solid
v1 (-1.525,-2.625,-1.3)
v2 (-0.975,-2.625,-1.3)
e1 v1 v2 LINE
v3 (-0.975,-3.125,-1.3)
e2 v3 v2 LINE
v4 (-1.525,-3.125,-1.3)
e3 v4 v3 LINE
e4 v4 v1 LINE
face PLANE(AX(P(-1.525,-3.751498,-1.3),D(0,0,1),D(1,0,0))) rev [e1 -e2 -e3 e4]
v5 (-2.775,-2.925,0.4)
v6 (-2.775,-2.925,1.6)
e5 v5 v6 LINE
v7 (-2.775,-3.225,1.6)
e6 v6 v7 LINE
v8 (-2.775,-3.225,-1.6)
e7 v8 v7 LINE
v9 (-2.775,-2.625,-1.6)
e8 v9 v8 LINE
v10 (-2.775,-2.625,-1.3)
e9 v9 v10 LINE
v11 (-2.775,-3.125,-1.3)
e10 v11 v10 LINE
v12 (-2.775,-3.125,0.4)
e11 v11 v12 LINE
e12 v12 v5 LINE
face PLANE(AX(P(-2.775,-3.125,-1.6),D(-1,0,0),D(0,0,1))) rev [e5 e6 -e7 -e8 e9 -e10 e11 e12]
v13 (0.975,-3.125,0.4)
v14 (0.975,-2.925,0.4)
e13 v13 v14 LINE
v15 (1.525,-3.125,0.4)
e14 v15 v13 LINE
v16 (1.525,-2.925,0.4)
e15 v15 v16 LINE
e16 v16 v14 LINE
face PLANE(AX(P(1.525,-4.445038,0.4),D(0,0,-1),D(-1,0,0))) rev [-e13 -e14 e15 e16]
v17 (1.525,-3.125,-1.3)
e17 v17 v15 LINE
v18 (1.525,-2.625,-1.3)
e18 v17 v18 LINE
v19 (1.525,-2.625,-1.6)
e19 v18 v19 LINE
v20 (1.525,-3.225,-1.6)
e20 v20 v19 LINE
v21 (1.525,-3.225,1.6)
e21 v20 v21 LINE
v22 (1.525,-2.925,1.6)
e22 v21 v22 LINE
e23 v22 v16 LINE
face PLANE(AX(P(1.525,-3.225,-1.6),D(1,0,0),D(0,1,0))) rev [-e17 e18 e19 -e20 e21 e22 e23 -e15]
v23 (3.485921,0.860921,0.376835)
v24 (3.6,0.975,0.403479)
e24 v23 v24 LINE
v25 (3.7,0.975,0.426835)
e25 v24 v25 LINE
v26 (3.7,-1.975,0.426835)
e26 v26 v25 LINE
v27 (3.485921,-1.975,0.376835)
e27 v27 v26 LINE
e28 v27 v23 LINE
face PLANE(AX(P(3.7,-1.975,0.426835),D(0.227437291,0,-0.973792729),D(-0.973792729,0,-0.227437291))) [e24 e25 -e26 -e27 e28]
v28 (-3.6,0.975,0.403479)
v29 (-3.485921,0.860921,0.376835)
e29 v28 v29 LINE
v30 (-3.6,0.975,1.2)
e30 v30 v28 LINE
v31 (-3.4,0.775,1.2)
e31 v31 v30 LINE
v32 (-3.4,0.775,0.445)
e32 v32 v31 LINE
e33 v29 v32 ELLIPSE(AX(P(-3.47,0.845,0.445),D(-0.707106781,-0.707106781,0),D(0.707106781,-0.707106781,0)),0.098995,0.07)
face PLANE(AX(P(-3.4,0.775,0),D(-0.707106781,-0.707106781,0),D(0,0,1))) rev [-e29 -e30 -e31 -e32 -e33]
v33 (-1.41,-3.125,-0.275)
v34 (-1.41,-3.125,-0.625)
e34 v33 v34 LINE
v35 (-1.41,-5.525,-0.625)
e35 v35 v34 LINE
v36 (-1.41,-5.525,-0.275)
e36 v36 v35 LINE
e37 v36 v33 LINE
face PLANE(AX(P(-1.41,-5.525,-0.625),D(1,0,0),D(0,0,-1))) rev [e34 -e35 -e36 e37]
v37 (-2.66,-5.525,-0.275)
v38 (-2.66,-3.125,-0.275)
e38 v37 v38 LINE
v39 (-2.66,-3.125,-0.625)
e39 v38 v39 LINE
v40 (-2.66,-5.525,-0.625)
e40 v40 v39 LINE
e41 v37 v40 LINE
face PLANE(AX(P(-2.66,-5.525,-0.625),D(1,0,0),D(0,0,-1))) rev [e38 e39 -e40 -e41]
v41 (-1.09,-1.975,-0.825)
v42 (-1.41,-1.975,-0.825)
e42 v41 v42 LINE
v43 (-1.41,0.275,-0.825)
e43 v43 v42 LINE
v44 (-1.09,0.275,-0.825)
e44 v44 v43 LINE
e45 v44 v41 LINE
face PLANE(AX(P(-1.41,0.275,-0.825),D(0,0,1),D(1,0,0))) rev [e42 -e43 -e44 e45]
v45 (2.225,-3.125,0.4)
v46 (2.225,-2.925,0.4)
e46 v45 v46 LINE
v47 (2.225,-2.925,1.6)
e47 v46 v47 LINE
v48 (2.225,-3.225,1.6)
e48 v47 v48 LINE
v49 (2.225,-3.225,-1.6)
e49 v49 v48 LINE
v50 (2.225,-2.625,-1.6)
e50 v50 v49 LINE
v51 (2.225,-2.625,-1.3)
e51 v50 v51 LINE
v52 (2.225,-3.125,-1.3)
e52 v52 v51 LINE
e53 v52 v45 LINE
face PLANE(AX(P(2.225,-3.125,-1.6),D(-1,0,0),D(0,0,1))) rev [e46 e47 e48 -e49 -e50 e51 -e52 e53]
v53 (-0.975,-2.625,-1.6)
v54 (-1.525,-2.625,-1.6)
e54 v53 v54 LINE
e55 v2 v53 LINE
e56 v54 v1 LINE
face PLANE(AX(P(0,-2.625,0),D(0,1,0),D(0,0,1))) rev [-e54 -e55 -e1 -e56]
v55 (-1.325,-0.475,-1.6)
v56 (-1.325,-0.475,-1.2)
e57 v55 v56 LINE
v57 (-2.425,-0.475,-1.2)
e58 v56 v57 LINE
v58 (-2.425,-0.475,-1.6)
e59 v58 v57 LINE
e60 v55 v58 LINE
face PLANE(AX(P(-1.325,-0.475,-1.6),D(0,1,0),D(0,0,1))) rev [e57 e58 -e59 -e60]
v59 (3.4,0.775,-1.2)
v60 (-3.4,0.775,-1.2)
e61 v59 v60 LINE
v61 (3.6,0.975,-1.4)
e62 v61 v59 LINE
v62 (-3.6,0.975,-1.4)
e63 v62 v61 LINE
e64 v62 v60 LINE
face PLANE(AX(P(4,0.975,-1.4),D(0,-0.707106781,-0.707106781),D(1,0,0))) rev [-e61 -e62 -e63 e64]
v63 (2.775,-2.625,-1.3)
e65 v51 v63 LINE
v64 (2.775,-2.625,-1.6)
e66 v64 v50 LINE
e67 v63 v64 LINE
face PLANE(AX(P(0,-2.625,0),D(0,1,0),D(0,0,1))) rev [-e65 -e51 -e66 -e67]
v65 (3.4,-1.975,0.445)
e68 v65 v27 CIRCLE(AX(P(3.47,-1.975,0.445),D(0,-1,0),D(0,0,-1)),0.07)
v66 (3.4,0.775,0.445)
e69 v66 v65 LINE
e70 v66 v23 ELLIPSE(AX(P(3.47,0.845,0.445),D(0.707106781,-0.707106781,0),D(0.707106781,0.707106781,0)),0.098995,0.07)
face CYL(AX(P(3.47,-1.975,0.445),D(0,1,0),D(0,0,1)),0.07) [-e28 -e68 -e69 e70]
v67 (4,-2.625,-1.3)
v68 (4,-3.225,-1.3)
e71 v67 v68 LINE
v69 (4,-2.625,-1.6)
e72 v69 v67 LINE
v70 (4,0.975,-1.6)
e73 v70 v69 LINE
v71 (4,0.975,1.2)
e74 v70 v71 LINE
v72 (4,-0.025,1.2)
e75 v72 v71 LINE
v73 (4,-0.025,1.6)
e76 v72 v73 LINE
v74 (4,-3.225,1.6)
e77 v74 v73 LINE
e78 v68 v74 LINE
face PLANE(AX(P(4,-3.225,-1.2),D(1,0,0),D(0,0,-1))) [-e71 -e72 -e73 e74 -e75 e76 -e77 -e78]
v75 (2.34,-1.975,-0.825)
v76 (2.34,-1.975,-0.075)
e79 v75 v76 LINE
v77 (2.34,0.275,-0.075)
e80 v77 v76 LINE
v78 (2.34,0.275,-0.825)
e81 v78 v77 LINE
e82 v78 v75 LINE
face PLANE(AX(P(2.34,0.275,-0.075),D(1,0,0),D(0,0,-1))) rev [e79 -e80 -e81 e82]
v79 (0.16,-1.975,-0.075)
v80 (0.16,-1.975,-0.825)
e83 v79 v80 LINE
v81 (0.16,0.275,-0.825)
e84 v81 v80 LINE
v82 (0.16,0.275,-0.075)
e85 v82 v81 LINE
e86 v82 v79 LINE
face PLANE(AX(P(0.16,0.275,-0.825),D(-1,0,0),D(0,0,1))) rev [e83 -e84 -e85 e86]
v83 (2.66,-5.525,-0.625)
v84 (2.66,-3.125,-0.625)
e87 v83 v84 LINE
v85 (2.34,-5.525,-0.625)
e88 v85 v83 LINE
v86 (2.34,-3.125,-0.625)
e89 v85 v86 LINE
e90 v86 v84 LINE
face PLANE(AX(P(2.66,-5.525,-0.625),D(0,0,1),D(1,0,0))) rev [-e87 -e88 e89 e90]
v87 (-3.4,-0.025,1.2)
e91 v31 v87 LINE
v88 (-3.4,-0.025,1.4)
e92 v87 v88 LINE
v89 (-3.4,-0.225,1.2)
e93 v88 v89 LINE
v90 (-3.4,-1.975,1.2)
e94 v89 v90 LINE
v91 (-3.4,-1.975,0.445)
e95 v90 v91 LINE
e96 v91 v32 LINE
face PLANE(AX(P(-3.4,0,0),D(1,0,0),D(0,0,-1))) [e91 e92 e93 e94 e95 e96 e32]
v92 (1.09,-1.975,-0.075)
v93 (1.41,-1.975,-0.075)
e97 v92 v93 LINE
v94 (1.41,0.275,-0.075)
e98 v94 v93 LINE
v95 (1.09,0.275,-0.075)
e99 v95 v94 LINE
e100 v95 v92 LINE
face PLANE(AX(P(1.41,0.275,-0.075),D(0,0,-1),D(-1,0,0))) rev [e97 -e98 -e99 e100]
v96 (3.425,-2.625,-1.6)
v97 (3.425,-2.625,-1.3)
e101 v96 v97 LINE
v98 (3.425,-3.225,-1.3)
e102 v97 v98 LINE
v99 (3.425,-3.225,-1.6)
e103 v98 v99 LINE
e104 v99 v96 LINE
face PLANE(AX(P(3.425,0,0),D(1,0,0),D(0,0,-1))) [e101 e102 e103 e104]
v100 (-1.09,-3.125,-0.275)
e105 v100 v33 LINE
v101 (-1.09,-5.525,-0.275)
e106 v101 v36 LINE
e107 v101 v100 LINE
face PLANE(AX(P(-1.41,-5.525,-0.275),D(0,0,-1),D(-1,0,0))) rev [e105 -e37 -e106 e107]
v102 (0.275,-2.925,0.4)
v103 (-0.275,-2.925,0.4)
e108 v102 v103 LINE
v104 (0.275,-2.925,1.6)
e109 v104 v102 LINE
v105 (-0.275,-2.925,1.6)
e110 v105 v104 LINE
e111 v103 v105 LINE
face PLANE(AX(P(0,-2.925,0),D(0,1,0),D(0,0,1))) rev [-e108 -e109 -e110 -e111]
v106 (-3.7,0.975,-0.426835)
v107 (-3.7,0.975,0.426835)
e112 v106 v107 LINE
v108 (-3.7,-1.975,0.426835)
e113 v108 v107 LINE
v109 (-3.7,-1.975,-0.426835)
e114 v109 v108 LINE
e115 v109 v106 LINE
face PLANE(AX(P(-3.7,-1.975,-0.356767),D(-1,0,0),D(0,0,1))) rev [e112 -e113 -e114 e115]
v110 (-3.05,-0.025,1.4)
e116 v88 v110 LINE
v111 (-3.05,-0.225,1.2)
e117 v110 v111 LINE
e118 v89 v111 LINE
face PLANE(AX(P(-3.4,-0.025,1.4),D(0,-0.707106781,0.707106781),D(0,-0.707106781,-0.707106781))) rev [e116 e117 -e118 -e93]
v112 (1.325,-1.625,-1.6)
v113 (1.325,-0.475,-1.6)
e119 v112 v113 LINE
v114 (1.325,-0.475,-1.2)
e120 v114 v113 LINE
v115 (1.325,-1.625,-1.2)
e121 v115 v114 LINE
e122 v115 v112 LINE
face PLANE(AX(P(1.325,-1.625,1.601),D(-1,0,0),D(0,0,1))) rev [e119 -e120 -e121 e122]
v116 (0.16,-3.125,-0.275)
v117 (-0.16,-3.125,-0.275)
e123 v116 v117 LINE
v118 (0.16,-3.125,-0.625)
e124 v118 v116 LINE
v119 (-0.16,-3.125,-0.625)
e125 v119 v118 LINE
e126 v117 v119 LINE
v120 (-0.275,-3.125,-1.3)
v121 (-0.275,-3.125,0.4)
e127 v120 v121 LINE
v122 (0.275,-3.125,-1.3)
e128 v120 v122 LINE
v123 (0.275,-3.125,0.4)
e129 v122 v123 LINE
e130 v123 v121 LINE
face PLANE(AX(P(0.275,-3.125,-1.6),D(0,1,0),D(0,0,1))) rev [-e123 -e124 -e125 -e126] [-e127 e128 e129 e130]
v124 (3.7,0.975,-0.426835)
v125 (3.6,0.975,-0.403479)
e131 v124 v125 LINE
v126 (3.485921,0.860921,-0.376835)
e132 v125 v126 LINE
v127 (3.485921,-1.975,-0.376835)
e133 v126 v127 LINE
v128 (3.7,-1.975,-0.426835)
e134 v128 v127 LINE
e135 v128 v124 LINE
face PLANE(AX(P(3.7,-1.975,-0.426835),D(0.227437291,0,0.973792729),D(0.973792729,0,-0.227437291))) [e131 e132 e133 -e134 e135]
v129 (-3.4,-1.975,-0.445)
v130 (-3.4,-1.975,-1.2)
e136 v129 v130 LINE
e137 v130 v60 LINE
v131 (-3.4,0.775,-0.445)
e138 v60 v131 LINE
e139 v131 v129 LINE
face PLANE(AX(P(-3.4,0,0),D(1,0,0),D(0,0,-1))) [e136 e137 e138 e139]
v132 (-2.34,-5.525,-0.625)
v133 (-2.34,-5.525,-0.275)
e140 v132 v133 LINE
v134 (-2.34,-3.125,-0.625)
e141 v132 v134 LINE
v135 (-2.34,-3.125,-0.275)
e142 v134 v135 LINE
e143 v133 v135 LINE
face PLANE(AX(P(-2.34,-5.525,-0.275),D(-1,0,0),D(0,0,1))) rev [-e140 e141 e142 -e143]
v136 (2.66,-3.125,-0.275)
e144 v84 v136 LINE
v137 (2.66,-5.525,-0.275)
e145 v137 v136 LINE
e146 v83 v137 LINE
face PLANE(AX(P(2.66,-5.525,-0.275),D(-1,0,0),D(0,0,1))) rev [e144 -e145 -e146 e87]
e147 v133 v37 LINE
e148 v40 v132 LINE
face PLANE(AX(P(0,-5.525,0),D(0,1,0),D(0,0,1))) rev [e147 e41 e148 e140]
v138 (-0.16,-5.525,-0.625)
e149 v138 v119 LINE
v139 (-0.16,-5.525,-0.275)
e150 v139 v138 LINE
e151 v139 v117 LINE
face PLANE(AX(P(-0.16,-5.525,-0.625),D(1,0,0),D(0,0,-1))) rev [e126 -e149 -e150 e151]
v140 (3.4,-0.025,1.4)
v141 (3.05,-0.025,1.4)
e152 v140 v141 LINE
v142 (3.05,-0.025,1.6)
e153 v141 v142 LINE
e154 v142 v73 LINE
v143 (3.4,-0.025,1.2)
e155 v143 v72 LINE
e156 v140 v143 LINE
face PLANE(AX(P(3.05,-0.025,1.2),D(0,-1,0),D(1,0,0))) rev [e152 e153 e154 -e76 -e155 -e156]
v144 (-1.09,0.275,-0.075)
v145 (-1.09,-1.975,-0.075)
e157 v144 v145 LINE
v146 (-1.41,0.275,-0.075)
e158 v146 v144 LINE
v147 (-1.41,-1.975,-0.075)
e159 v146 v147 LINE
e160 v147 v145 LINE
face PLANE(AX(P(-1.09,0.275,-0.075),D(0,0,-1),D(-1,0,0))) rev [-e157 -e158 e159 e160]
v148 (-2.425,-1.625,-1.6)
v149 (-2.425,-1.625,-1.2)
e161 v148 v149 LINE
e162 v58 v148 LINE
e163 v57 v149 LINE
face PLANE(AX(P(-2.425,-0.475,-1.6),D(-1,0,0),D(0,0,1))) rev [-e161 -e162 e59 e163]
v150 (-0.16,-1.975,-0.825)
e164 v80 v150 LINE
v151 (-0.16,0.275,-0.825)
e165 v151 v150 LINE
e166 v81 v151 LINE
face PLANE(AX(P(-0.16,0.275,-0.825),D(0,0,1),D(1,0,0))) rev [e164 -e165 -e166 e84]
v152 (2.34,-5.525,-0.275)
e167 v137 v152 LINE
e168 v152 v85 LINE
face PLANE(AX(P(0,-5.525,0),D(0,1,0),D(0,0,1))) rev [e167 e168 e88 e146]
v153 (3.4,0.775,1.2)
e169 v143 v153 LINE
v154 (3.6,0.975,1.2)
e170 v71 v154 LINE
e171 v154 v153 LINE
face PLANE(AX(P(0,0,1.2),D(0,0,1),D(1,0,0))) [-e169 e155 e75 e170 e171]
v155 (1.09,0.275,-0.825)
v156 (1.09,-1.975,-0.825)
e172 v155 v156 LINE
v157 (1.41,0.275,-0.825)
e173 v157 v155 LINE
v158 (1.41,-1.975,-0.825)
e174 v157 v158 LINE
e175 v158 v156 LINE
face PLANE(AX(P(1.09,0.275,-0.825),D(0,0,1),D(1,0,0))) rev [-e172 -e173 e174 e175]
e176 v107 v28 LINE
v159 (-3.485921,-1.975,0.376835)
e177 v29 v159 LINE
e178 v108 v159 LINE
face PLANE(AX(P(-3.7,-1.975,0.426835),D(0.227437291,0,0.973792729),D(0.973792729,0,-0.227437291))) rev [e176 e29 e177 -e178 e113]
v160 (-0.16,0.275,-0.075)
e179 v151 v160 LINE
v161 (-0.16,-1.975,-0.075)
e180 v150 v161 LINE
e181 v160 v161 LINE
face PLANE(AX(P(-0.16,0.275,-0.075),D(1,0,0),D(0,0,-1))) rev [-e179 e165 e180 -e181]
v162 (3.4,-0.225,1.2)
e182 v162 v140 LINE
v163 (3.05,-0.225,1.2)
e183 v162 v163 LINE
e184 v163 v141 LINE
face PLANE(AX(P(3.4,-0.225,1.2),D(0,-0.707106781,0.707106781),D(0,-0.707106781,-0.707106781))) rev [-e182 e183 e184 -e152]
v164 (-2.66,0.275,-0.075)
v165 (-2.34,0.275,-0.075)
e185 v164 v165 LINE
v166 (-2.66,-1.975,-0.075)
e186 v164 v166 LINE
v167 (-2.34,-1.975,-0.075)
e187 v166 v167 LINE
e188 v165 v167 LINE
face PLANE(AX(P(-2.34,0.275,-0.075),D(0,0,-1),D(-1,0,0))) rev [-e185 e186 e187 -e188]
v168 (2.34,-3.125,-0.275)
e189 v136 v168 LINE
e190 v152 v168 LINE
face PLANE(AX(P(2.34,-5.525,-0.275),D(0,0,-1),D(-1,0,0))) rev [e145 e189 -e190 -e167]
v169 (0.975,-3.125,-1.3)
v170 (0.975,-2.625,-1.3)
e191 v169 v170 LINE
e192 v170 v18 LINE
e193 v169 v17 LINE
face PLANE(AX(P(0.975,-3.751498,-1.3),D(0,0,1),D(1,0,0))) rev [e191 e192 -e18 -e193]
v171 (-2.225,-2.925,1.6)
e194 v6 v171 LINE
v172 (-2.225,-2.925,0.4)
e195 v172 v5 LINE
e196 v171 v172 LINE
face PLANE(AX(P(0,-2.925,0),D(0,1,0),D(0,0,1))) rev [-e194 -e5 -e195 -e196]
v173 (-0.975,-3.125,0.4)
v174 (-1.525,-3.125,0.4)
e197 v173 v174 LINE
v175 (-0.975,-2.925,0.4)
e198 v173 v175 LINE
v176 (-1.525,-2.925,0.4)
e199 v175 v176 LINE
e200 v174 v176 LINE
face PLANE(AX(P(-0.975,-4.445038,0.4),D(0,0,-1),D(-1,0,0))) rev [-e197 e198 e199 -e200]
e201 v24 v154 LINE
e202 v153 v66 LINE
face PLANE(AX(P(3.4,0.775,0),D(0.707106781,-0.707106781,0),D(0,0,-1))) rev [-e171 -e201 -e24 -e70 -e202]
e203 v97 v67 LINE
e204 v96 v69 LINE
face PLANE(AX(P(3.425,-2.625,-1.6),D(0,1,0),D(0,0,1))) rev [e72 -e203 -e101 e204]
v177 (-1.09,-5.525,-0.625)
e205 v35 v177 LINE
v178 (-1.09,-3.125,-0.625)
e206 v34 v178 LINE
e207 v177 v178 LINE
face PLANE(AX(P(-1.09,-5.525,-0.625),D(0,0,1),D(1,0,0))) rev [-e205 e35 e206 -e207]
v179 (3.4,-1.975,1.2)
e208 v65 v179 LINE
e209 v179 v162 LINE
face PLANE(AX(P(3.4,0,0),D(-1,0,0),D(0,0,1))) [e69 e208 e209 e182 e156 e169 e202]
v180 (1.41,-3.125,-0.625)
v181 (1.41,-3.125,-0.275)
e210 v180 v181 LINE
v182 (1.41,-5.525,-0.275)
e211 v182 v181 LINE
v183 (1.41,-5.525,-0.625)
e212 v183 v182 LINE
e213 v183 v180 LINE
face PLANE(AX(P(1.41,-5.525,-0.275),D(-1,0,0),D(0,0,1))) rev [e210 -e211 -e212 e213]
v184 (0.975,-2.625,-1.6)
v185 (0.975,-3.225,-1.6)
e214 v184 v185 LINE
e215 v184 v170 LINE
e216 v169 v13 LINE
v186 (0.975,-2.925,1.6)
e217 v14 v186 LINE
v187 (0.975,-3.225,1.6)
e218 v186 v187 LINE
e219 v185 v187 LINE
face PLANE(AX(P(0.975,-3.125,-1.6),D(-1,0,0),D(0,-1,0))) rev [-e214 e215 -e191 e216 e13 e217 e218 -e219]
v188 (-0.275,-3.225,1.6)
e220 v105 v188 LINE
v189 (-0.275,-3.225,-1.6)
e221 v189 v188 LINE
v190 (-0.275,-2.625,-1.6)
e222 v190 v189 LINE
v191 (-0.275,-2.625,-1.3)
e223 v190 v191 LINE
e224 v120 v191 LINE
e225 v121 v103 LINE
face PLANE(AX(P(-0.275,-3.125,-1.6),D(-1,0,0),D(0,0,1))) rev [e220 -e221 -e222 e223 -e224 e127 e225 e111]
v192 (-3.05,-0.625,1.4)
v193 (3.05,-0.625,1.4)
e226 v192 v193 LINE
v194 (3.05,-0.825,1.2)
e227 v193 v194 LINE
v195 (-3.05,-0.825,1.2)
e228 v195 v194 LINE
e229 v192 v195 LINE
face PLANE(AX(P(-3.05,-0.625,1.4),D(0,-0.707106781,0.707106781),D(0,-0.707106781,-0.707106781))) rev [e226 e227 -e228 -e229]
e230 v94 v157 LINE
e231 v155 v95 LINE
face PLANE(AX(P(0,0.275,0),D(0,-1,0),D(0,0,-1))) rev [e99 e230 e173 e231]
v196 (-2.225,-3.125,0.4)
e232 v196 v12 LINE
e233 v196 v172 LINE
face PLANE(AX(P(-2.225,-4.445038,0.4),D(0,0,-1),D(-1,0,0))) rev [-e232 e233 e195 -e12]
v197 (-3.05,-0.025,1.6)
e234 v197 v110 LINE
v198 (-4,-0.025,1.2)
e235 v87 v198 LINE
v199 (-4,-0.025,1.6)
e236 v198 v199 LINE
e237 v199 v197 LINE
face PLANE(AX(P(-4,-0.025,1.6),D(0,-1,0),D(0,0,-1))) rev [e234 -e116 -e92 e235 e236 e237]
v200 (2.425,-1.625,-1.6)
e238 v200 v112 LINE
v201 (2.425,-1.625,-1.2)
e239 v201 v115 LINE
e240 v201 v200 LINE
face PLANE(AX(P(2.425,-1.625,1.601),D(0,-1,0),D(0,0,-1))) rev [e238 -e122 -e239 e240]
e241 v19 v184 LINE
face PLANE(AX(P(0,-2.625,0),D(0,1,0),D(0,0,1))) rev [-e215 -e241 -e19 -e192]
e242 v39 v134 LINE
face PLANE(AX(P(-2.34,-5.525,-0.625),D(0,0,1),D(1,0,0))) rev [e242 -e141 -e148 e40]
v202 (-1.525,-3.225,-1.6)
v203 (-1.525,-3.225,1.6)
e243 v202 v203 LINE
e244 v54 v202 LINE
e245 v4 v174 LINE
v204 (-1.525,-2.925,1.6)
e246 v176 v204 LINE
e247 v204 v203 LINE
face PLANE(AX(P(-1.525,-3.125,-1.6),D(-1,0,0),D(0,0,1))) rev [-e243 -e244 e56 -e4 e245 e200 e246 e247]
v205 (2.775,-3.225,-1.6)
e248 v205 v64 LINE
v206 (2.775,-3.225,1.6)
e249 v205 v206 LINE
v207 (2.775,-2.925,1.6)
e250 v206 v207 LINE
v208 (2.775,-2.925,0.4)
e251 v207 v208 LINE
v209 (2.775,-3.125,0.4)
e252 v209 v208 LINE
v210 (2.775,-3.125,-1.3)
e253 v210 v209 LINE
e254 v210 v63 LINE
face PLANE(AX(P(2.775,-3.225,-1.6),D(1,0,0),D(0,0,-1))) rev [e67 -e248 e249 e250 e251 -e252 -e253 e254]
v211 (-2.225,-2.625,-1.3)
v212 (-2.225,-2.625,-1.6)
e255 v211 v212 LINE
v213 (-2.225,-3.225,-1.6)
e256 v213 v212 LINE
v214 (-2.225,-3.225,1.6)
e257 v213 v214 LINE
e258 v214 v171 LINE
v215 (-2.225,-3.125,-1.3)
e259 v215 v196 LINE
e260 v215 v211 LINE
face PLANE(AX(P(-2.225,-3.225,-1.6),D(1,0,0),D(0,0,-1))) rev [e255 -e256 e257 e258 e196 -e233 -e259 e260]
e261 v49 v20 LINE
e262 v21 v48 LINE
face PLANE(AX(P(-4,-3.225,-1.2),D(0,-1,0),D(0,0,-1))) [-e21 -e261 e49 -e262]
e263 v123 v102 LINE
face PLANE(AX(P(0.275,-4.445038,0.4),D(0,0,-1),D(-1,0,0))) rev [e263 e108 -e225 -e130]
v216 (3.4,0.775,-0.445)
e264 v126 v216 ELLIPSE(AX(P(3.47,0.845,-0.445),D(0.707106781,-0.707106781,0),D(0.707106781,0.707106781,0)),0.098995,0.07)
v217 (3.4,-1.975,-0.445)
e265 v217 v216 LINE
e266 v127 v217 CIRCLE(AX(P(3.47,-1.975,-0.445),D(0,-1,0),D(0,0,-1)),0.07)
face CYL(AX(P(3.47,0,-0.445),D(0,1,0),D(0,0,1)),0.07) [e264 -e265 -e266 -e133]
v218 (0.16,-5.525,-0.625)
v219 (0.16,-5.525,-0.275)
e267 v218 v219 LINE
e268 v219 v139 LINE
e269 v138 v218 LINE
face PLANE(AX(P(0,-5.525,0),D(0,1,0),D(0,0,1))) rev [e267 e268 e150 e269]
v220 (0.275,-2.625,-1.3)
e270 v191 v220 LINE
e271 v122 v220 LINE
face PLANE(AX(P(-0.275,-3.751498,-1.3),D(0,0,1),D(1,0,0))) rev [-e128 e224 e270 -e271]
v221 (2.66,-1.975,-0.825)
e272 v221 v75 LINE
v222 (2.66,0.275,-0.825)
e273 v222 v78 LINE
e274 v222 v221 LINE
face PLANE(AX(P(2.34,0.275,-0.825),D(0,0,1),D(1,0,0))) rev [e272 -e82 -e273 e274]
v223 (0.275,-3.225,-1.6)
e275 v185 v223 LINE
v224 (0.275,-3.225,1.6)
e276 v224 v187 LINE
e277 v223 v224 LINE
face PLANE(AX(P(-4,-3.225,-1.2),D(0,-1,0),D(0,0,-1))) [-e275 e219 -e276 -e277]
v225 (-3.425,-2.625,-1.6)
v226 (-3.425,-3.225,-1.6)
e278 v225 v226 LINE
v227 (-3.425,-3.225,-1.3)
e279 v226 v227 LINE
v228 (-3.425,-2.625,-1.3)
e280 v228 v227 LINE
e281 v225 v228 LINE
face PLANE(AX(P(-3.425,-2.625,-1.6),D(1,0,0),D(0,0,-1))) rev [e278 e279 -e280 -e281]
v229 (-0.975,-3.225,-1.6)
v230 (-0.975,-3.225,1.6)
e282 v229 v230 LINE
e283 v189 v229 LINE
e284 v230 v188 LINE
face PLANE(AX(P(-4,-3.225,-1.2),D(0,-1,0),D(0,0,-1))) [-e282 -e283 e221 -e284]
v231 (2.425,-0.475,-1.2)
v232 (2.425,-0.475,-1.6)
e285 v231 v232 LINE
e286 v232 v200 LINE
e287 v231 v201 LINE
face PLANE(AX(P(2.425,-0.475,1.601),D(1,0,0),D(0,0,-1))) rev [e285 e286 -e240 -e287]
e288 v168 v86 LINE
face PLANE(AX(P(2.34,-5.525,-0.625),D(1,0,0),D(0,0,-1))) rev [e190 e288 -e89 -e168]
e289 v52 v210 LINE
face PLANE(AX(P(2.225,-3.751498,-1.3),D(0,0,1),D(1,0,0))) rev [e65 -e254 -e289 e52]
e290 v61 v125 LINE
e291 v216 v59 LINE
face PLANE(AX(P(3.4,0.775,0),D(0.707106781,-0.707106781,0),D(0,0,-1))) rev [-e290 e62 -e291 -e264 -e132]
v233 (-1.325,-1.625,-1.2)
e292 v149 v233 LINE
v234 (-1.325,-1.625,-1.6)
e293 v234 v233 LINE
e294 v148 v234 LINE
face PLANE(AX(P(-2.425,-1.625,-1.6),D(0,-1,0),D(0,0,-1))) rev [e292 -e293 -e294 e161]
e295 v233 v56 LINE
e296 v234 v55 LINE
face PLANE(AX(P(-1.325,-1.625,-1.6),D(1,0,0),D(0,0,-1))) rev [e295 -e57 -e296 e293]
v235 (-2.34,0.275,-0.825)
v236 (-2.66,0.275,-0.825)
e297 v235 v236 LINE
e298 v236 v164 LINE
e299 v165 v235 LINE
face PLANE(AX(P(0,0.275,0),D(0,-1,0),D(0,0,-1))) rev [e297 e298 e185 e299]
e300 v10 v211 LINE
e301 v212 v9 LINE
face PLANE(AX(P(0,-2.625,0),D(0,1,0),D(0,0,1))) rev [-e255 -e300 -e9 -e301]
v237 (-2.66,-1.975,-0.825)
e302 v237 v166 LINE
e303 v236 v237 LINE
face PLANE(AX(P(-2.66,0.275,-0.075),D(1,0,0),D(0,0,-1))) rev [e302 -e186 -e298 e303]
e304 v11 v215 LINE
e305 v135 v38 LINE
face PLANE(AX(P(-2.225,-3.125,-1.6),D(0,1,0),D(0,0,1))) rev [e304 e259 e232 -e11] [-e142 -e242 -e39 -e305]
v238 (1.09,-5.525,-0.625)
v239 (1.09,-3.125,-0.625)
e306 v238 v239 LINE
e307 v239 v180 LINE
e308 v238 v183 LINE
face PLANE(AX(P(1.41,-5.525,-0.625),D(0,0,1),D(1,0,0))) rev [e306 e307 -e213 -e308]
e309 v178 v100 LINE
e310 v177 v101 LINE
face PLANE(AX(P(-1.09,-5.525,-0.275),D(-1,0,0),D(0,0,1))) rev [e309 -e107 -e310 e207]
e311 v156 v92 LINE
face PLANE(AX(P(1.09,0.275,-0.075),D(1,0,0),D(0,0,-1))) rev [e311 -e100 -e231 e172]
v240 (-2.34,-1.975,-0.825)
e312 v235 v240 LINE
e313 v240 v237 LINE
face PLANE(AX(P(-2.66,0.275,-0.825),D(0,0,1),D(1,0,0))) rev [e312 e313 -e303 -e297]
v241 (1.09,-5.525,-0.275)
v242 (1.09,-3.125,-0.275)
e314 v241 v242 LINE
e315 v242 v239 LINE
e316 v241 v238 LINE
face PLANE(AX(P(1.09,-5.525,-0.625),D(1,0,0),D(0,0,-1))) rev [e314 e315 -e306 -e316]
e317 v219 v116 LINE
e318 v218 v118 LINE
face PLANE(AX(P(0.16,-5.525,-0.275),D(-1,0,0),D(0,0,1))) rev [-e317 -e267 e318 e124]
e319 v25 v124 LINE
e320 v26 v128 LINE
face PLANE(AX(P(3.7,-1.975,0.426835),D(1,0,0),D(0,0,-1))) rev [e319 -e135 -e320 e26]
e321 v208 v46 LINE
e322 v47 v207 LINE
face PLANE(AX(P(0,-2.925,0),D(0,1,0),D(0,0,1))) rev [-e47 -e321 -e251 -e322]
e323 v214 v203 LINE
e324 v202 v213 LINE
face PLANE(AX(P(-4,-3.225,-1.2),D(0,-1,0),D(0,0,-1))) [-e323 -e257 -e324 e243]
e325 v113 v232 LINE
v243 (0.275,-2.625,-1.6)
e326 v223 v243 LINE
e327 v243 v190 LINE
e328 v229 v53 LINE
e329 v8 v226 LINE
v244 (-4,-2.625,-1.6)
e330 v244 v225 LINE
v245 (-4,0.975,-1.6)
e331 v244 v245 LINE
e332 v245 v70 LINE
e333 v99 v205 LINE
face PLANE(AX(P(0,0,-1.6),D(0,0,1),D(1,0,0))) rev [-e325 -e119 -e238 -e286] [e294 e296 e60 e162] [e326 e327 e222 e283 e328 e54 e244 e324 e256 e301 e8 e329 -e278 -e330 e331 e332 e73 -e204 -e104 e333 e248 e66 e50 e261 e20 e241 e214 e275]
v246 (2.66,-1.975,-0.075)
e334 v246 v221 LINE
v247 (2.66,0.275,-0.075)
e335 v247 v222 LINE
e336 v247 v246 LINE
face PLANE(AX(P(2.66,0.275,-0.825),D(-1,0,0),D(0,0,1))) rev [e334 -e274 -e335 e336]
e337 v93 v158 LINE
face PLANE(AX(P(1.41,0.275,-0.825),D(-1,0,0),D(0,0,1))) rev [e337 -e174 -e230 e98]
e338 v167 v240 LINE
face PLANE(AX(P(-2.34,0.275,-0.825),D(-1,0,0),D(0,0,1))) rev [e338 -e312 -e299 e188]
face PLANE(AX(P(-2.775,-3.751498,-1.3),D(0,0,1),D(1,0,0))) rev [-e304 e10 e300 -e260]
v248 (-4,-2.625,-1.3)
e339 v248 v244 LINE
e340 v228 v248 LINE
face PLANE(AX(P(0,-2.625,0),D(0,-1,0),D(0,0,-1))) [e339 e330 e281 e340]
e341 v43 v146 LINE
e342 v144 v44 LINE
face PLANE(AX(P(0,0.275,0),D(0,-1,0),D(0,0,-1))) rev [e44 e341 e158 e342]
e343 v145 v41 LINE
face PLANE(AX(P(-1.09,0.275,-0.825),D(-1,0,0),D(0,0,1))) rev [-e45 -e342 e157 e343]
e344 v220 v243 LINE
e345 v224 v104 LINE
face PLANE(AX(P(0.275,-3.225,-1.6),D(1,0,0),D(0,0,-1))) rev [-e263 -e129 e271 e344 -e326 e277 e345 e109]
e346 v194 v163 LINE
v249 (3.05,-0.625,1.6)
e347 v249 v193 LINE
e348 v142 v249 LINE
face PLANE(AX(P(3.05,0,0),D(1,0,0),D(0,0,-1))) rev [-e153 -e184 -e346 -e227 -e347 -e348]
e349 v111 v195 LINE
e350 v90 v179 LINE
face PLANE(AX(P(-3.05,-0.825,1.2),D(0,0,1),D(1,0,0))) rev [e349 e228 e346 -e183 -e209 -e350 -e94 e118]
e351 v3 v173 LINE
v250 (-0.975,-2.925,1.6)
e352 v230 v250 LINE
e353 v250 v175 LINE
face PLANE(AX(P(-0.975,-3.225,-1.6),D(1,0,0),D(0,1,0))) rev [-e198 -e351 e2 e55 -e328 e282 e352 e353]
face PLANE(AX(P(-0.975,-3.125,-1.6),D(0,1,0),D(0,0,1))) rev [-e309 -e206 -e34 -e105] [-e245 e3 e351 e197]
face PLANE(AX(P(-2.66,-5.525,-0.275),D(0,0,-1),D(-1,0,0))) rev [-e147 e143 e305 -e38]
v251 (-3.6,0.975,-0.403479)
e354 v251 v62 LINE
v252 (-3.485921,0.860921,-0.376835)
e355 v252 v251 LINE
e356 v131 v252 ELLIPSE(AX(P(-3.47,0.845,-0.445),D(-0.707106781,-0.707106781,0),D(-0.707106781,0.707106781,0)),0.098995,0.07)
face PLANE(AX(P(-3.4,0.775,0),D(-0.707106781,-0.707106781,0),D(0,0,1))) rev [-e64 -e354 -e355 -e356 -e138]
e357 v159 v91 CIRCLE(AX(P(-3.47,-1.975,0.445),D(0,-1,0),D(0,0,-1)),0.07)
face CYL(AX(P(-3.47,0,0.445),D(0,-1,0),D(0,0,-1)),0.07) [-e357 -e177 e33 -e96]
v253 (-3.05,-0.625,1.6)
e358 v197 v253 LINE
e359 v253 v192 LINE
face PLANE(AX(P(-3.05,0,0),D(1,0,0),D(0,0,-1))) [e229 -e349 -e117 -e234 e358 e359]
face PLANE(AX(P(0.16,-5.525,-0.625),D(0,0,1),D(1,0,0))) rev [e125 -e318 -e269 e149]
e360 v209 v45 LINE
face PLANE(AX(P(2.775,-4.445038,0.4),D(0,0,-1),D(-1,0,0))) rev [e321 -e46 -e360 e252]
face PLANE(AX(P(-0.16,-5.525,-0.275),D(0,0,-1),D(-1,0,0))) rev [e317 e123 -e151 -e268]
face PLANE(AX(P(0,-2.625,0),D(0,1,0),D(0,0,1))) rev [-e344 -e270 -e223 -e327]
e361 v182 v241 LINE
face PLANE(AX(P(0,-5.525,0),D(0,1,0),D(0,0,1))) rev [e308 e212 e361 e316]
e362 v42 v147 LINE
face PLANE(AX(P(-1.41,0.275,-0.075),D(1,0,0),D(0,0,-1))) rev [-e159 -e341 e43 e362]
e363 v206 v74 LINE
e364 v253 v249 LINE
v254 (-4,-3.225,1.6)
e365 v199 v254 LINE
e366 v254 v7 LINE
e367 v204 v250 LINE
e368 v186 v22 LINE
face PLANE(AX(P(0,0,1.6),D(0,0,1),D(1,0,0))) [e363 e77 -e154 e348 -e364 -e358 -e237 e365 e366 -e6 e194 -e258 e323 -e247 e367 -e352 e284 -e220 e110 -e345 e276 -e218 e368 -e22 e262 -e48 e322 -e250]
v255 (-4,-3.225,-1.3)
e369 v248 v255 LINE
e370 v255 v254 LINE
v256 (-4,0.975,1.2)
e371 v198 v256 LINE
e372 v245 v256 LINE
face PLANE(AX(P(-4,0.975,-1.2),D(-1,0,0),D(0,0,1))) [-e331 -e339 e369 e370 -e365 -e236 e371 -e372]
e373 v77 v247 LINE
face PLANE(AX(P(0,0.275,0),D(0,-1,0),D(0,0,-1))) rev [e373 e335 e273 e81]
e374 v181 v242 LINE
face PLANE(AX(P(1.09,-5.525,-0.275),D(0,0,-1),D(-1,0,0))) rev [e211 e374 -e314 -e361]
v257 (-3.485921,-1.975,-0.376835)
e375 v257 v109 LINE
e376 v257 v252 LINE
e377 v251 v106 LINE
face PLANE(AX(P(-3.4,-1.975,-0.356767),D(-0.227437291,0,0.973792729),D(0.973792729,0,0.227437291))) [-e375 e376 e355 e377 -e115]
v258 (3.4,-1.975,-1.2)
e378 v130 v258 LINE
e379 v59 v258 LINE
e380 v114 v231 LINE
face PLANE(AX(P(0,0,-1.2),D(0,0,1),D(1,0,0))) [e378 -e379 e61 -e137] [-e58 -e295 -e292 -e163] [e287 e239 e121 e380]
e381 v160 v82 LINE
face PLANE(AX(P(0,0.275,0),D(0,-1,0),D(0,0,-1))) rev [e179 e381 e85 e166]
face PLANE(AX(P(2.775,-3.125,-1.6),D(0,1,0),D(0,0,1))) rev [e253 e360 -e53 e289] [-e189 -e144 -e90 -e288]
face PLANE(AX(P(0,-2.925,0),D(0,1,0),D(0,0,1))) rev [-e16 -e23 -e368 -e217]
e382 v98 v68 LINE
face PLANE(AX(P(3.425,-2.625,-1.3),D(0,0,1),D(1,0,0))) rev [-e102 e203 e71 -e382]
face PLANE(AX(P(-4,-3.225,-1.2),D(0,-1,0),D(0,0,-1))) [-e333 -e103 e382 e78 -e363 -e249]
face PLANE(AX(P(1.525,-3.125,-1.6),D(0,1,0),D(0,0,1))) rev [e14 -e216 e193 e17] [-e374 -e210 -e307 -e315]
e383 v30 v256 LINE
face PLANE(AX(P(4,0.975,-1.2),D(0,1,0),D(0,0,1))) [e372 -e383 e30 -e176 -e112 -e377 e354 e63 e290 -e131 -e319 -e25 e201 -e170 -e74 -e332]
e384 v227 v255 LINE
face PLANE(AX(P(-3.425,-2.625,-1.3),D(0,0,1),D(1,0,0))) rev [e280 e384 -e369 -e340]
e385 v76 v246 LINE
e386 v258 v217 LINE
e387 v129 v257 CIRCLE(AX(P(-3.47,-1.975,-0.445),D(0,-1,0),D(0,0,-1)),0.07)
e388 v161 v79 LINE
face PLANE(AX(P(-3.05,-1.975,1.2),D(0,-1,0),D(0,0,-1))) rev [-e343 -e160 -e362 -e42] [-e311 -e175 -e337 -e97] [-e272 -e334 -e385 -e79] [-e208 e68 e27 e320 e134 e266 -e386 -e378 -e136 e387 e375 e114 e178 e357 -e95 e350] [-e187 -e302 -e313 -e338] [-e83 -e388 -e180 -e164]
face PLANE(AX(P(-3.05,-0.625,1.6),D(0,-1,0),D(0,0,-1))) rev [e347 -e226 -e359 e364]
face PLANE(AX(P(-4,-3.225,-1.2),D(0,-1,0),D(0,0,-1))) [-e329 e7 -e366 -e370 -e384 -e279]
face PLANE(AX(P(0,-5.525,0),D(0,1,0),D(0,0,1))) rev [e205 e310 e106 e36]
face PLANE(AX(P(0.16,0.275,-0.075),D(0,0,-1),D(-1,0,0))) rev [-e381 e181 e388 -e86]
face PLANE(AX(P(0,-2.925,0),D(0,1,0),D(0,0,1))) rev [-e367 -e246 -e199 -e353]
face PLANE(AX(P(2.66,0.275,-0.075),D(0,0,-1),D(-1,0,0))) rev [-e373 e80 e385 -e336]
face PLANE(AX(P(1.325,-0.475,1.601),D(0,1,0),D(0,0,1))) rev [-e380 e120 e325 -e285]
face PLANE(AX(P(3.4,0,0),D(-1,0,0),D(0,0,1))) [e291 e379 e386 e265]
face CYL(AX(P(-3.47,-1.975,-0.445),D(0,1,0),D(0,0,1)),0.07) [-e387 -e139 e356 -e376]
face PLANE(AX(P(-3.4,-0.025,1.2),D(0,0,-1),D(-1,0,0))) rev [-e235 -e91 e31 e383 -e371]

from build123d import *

# Parameters (mm, degrees)
SKETCH1_W            = 8
SKETCH1_H            = 4.2
BOSS_EXTRUDE1_DEPTH  = 2.8
CUT_EXTRUDE1_DEPTH   = 6.1
SKETCH3_W            = 0.95
SKETCH3_H            = 1
CUT_EXTRUDE2_DEPTH   = 0.4
CUT_EXTRUDE3_DEPTH   = 1
CUT_EXTRUDE4_DEPTH   = 0.35
CUT_EXTRUDE5_DEPTH   = 0.35
SKETCH7_W            = 8
SKETCH7_H            = 4.2
BOSS_EXTRUDE2_DEPTH  = 0.4
SKETCH8_W            = 0.55
SKETCH8_H            = 0.1
CUT_EXTRUDE6_DEPTH   = 3.2
CUT_EXTRUDE7_REACH   = 7.811
SKETCH10_W           = 0.55
SKETCH10_H           = 1.2
SKETCH11_W           = 0.55
SKETCH11_H           = 0.1
CUT_EXTRUDE8_DEPTH   = 3.2
CUT_EXTRUDE9_REACH   = 7.811
SKETCH13_W           = 0.55
SKETCH13_H           = 1.2
SKETCH14_W           = 0.55
SKETCH14_H           = 0.1
CUT_EXTRUDE10_DEPTH  = 3.2
CUT_EXTRUDE11_REACH  = 7.811
SKETCH16_W           = 0.55
SKETCH16_H           = 1.2
SKETCH17_W           = 0.55
SKETCH17_H           = 0.1
CUT_EXTRUDE12_DEPTH  = 3.2
CUT_EXTRUDE13_REACH  = 7.811
SKETCH19_W           = 0.55
SKETCH19_H           = 1.2
SKETCH20_W           = 0.55
SKETCH20_H           = 0.1
CUT_EXTRUDE14_DEPTH  = 3.2
CUT_EXTRUDE15_REACH  = 7.811
SKETCH22_W           = 0.55
SKETCH22_H           = 1.2
CUT_EXTRUDE16_REACH  = 7.614
SKETCH24_W           = 0.55
SKETCH24_H           = 0.3
CUT_EXTRUDE17_REACH  = 7.614
SKETCH26_W           = 0.55
SKETCH26_H           = 0.3
CUT_EXTRUDE18_REACH  = 7.614
SKETCH28_W           = 0.55
SKETCH28_H           = 0.3
CUT_EXTRUDE19_REACH  = 7.614
SKETCH30_W           = 0.55
SKETCH30_H           = 0.3
CUT_EXTRUDE20_REACH  = 7.614
SKETCH32_W           = 0.55
SKETCH32_H           = 0.3
CUT_EXTRUDE21_DEPTH  = 2.95
SKETCH34_W           = 0.3
SKETCH34_H           = 0.853669018
CUT_EXTRUDE22_DEPTH  = 2.95
SKETCH35_W           = 1.1
SKETCH35_H           = 1.15
CUT_EXTRUDE23_DEPTH  = 6.85154894
CUT_EXTRUDE24_REACH  = 8.053
SKETCH36_W           = 1.1
SKETCH36_H           = 1.15
SKETCH37_W           = 0.575
SKETCH37_H           = 0.3
CUT_EXTRUDE25_DEPTH  = 0.6
SKETCH38_W           = 0.3
SKETCH38_H           = 0.6
CUT_EXTRUDE26_DEPTH  = 0.575
SKETCH39_W           = 0.32
SKETCH39_H           = 0.35
BOSS_EXTRUDE3_DEPTH  = 2.4
SKETCH40_W           = 0.32
SKETCH40_H           = 0.35
BOSS_EXTRUDE4_DEPTH  = 2.4
SKETCH41_W           = 0.32
SKETCH41_H           = 0.35
BOSS_EXTRUDE5_DEPTH  = 2.4
SKETCH42_W           = 0.32
SKETCH42_H           = 0.35
BOSS_EXTRUDE6_DEPTH  = 2.4
SKETCH43_W           = 0.32
SKETCH43_H           = 0.35
BOSS_EXTRUDE7_DEPTH  = 2.4
SKETCH44_W           = 0.32
SKETCH44_H           = 0.75
BOSS_EXTRUDE8_DEPTH  = 2.25
SKETCH45_W           = 0.32
SKETCH45_H           = 0.75
BOSS_EXTRUDE9_DEPTH  = 2.25
SKETCH46_W           = 0.32
SKETCH46_H           = 0.75
BOSS_EXTRUDE10_DEPTH = 2.25
SKETCH47_W           = 0.32
SKETCH47_H           = 0.75
BOSS_EXTRUDE11_DEPTH = 2.25
SKETCH48_W           = 0.32
SKETCH48_H           = 0.75
BOSS_EXTRUDE12_DEPTH = 2.25
DRAFT1_ANGLE         = -13.146241157
DRAFT2_ANGLE         = -13.146241157
FILLET1_R            = 0.07
CHAMFER1_SIZE        = 0.2


with BuildPart() as part:
    # Sketch1 → Boss-Extrude1 (new body)
    with BuildSketch(Plane.XY.offset(1.6)):
        with Locations((0, -1.125)):
            Rectangle(SKETCH1_W, SKETCH1_H)
    extrude(amount=-BOSS_EXTRUDE1_DEPTH)

    # Sketch2 → Cut-Extrude1 (cut)
    with BuildSketch(Plane(origin=(3.05, 0, 0), x_dir=(0, 0, -1), z_dir=(1, 0, 0))):
        Polygon((1.2, 0.975), (-1.6, 0.975), (-1.6, -0.625), (-1.4, -0.625), (-1.2, -0.825), (-1.2, -1.975), (1.2, -1.975), align=None)
    extrude(amount=-CUT_EXTRUDE1_DEPTH, mode=Mode.SUBTRACT)

    # Sketch3 → Cut-Extrude2 (cut)
    with BuildSketch(Plane.XY.offset(1.6)):
        with Locations((3.525, 0.475)):
            Rectangle(SKETCH3_W, SKETCH3_H)
    extrude(amount=-CUT_EXTRUDE2_DEPTH, mode=Mode.SUBTRACT)

    # Sketch4 → Cut-Extrude3 (cut)
    with BuildSketch(Plane(origin=(0, 0.975, 0), x_dir=(-1, 0, 0), z_dir=(0, 1, 0))):
        with BuildLine():
            Line((3.05, 1.6), (3.05, 1.2))
            add(Edge.make_bspline(
                [(3.05, 1.2), (3.166666667, 1.2), (3.283333333, 1.2), (3.4, 1.2)],
                knots=[0, 0, 0, 0, 1, 1, 1, 1], degree=3))
            Line((3.4, 1.2), (4, 1.2))
            Line((4, 1.2), (4, 1.6))
            Line((4, 1.6), (3.05, 1.6))
        make_face()
    extrude(amount=-CUT_EXTRUDE3_DEPTH, mode=Mode.SUBTRACT)

    # Sketch5 → Cut-Extrude4 (cut)
    with BuildSketch(Plane.ZY.offset(-3.05)):
        Polygon((-1.2, -1.975), (1.2, -1.975), (1.2, -0.225), (1.4, -0.025), (1.2, -0.025), (1.2, 0.975), (-1.2, 0.975), align=None)
    extrude(amount=-CUT_EXTRUDE4_DEPTH, mode=Mode.SUBTRACT)

    # Sketch6 → Cut-Extrude5 (cut)
    with BuildSketch(Plane(origin=(-3.05, 0, 0), x_dir=(0, 0, -1), z_dir=(1, 0, 0))):
        Polygon((1.2, -1.975), (1.2, 0.975), (-1.2, 0.975), (-1.2, -0.025), (-1.4, -0.025), (-1.2, -0.225), (-1.2, -1.975), align=None)
    extrude(amount=-CUT_EXTRUDE5_DEPTH, mode=Mode.SUBTRACT)

    # Sketch7 → Boss-Extrude2 (add)
    with BuildSketch(Plane(origin=(0, 0, -1.2), x_dir=(-1, 0, 0), z_dir=(0, 0, -1))):
        with Locations((0, -1.125)):
            Rectangle(SKETCH7_W, SKETCH7_H)
    extrude(amount=BOSS_EXTRUDE2_DEPTH)

    # Sketch8 → Cut-Extrude6 (cut)
    with BuildSketch(Plane.XY.offset(1.6)):
        with Locations((-1.25, -3.175)):
            Rectangle(SKETCH8_W, SKETCH8_H)
    extrude(amount=-CUT_EXTRUDE6_DEPTH, mode=Mode.SUBTRACT)

    # Sketch10 → Cut-Extrude7 (cut, up to next)
    with BuildSketch(Plane(origin=(0, -2.925, 0), x_dir=(1, 0, 0), z_dir=(0, 1, 0)), mode=Mode.PRIVATE) as cut_extrude7_sk1:
        with Locations((-1.25, -1)):
            Rectangle(SKETCH10_W, SKETCH10_H)
    cut_extrude7_tool1 = extrude(cut_extrude7_sk1.sketch, amount=-CUT_EXTRUDE7_REACH, mode=Mode.PRIVATE) & part.part
    add(cut_extrude7_tool1.solids().sort_by_distance((-1.25, -2.925, 1))[0], mode=Mode.SUBTRACT)

    # Sketch11 → Cut-Extrude8 (cut)
    with BuildSketch(Plane.XY.offset(1.6)):
        with Locations((0, -3.175)):
            Rectangle(SKETCH11_W, SKETCH11_H)
    extrude(amount=-CUT_EXTRUDE8_DEPTH, mode=Mode.SUBTRACT)

    # Sketch13 → Cut-Extrude9 (cut, up to next)
    with BuildSketch(Plane(origin=(0, -2.925, 0), x_dir=(1, 0, 0), z_dir=(0, 1, 0)), mode=Mode.PRIVATE) as cut_extrude9_sk1:
        with Locations((0, -1)):
            Rectangle(SKETCH13_W, SKETCH13_H)
    cut_extrude9_tool1 = extrude(cut_extrude9_sk1.sketch, amount=-CUT_EXTRUDE9_REACH, mode=Mode.PRIVATE) & part.part
    add(cut_extrude9_tool1.solids().sort_by_distance((0, -2.925, 1))[0], mode=Mode.SUBTRACT)

    # Sketch14 → Cut-Extrude10 (cut)
    with BuildSketch(Plane.XY.offset(1.6)):
        with Locations((1.25, -3.175)):
            Rectangle(SKETCH14_W, SKETCH14_H)
    extrude(amount=-CUT_EXTRUDE10_DEPTH, mode=Mode.SUBTRACT)

    # Sketch16 → Cut-Extrude11 (cut, up to next)
    with BuildSketch(Plane(origin=(0, -2.925, 0), x_dir=(1, 0, 0), z_dir=(0, 1, 0)), mode=Mode.PRIVATE) as cut_extrude11_sk1:
        with Locations((1.25, -1)):
            Rectangle(SKETCH16_W, SKETCH16_H)
    cut_extrude11_tool1 = extrude(cut_extrude11_sk1.sketch, amount=-CUT_EXTRUDE11_REACH, mode=Mode.PRIVATE) & part.part
    add(cut_extrude11_tool1.solids().sort_by_distance((1.25, -2.925, 1))[0], mode=Mode.SUBTRACT)

    # Sketch17 → Cut-Extrude12 (cut)
    with BuildSketch(Plane.XY.offset(1.6)):
        with Locations((2.5, -3.175)):
            Rectangle(SKETCH17_W, SKETCH17_H)
    extrude(amount=-CUT_EXTRUDE12_DEPTH, mode=Mode.SUBTRACT)

    # Sketch19 → Cut-Extrude13 (cut, up to next)
    with BuildSketch(Plane(origin=(0, -2.925, 0), x_dir=(1, 0, 0), z_dir=(0, 1, 0)), mode=Mode.PRIVATE) as cut_extrude13_sk1:
        with Locations((2.5, -1)):
            Rectangle(SKETCH19_W, SKETCH19_H)
    cut_extrude13_tool1 = extrude(cut_extrude13_sk1.sketch, amount=-CUT_EXTRUDE13_REACH, mode=Mode.PRIVATE) & part.part
    add(cut_extrude13_tool1.solids().sort_by_distance((2.5, -2.925, 1))[0], mode=Mode.SUBTRACT)

    # Sketch20 → Cut-Extrude14 (cut)
    with BuildSketch(Plane.XY.offset(1.6)):
        with Locations((-2.5, -3.175)):
            Rectangle(SKETCH20_W, SKETCH20_H)
    extrude(amount=-CUT_EXTRUDE14_DEPTH, mode=Mode.SUBTRACT)

    # Sketch22 → Cut-Extrude15 (cut, up to next)
    with BuildSketch(Plane(origin=(0, -2.925, 0), x_dir=(1, 0, 0), z_dir=(0, 1, 0)), mode=Mode.PRIVATE) as cut_extrude15_sk1:
        with Locations((-2.5, -1)):
            Rectangle(SKETCH22_W, SKETCH22_H)
    cut_extrude15_tool1 = extrude(cut_extrude15_sk1.sketch, amount=-CUT_EXTRUDE15_REACH, mode=Mode.PRIVATE) & part.part
    add(cut_extrude15_tool1.solids().sort_by_distance((-2.5, -2.925, 1))[0], mode=Mode.SUBTRACT)

    # Sketch24 → Cut-Extrude16 (cut, up to next)
    with BuildSketch(Plane(origin=(0, -2.625, 0), x_dir=(1, 0, 0), z_dir=(0, 1, 0)), mode=Mode.PRIVATE) as cut_extrude16_sk1:
        with Locations((-2.5, 1.45)):
            Rectangle(SKETCH24_W, SKETCH24_H)
    cut_extrude16_tool1 = extrude(cut_extrude16_sk1.sketch, amount=-CUT_EXTRUDE16_REACH, mode=Mode.PRIVATE) & part.part
    add(cut_extrude16_tool1.solids().sort_by_distance((-2.5, -2.625, -1.45))[0], mode=Mode.SUBTRACT)

    # Sketch26 → Cut-Extrude17 (cut, up to next)
    with BuildSketch(Plane(origin=(0, -2.625, 0), x_dir=(1, 0, 0), z_dir=(0, 1, 0)), mode=Mode.PRIVATE) as cut_extrude17_sk1:
        with Locations((2.5, 1.45)):
            Rectangle(SKETCH26_W, SKETCH26_H)
    cut_extrude17_tool1 = extrude(cut_extrude17_sk1.sketch, amount=-CUT_EXTRUDE17_REACH, mode=Mode.PRIVATE) & part.part
    add(cut_extrude17_tool1.solids().sort_by_distance((2.5, -2.625, -1.45))[0], mode=Mode.SUBTRACT)

    # Sketch28 → Cut-Extrude18 (cut, up to next)
    with BuildSketch(Plane(origin=(0, -2.625, 0), x_dir=(1, 0, 0), z_dir=(0, 1, 0)), mode=Mode.PRIVATE) as cut_extrude18_sk1:
        with Locations((1.25, 1.45)):
            Rectangle(SKETCH28_W, SKETCH28_H)
    cut_extrude18_tool1 = extrude(cut_extrude18_sk1.sketch, amount=-CUT_EXTRUDE18_REACH, mode=Mode.PRIVATE) & part.part
    add(cut_extrude18_tool1.solids().sort_by_distance((1.25, -2.625, -1.45))[0], mode=Mode.SUBTRACT)

    # Sketch30 → Cut-Extrude19 (cut, up to next)
    with BuildSketch(Plane(origin=(0, -2.625, 0), x_dir=(1, 0, 0), z_dir=(0, 1, 0)), mode=Mode.PRIVATE) as cut_extrude19_sk1:
        with Locations((0, 1.45)):
            Rectangle(SKETCH30_W, SKETCH30_H)
    cut_extrude19_tool1 = extrude(cut_extrude19_sk1.sketch, amount=-CUT_EXTRUDE19_REACH, mode=Mode.PRIVATE) & part.part
    add(cut_extrude19_tool1.solids().sort_by_distance((0, -2.625, -1.45))[0], mode=Mode.SUBTRACT)

    # Sketch32 → Cut-Extrude20 (cut, up to next)
    with BuildSketch(Plane(origin=(0, -2.625, 0), x_dir=(1, 0, 0), z_dir=(0, 1, 0)), mode=Mode.PRIVATE) as cut_extrude20_sk1:
        with Locations((-1.25, 1.45)):
            Rectangle(SKETCH32_W, SKETCH32_H)
    cut_extrude20_tool1 = extrude(cut_extrude20_sk1.sketch, amount=-CUT_EXTRUDE20_REACH, mode=Mode.PRIVATE) & part.part
    add(cut_extrude20_tool1.solids().sort_by_distance((-1.25, -2.625, -1.45))[0], mode=Mode.SUBTRACT)

    # Sketch33 → Cut-Extrude21 (cut)
    with BuildSketch(Plane(origin=(0, 0.975, 0), x_dir=(-1, 0, 0), z_dir=(0, 1, 0))):
        Polygon((3.7, -0.356767045), (3.7, 0.426834509), (3.4, 0.356767045), (3.4, -0.356767045), align=None)
    extrude(amount=-CUT_EXTRUDE21_DEPTH, mode=Mode.SUBTRACT)

    # Sketch34 → Cut-Extrude22 (cut)
    with BuildSketch(Plane(origin=(0, 0.975, 0), x_dir=(-1, 0, 0), z_dir=(0, 1, 0))):
        with Locations((-3.55, 0)):
            Rectangle(SKETCH34_W, SKETCH34_H)
    extrude(amount=-CUT_EXTRUDE22_DEPTH, mode=Mode.SUBTRACT)

    # Sketch35 → Cut-Extrude23 (cut, through all)
    with BuildSketch(Plane.XY.offset(-1.2)):
        with Locations((-1.875, -1.05)):
            Rectangle(SKETCH35_W, SKETCH35_H)
    extrude(amount=-CUT_EXTRUDE23_DEPTH, mode=Mode.SUBTRACT)

    # Sketch36 → Cut-Extrude24 (cut, up to next)
    with BuildSketch(Plane(origin=(0, 0, -1.6), x_dir=(-1, 0, 0), z_dir=(0, 0, -1)), mode=Mode.PRIVATE) as cut_extrude24_sk1:
        with Locations((-1.875, -1.05)):
            Rectangle(SKETCH36_W, SKETCH36_H)
    cut_extrude24_tool1 = extrude(cut_extrude24_sk1.sketch, amount=-CUT_EXTRUDE24_REACH, mode=Mode.PRIVATE) & part.part
    add(cut_extrude24_tool1.solids().sort_by_distance((1.875, -1.05, -1.6))[0], mode=Mode.SUBTRACT)

    # Sketch37 → Cut-Extrude25 (cut)
    with BuildSketch(Plane.XZ.offset(3.225)):
        with Locations((-3.7125, -1.45)):
            Rectangle(SKETCH37_W, SKETCH37_H)
    extrude(amount=-CUT_EXTRUDE25_DEPTH, mode=Mode.SUBTRACT)

    # Sketch38 → Cut-Extrude26 (cut)
    with BuildSketch(Plane(origin=(4, 0, 0), x_dir=(0, 0, -1), z_dir=(1, 0, 0))):
        with Locations((1.45, -2.925)):
            Rectangle(SKETCH38_W, SKETCH38_H)
    extrude(amount=-CUT_EXTRUDE26_DEPTH, mode=Mode.SUBTRACT)

    # Sketch39 → Boss-Extrude3 (add)
    with BuildSketch(Plane.XZ.offset(3.125)):
        with Locations((1.25, -0.45)):
            Rectangle(SKETCH39_W, SKETCH39_H)
    extrude(amount=BOSS_EXTRUDE3_DEPTH)

    # Sketch40 → Boss-Extrude4 (add)
    with BuildSketch(Plane.XZ.offset(3.125)):
        with Locations((0, -0.45)):
            Rectangle(SKETCH40_W, SKETCH40_H)
    extrude(amount=BOSS_EXTRUDE4_DEPTH)

    # Sketch41 → Boss-Extrude5 (add)
    with BuildSketch(Plane.XZ.offset(3.125)):
        with Locations((-1.25, -0.45)):
            Rectangle(SKETCH41_W, SKETCH41_H)
    extrude(amount=BOSS_EXTRUDE5_DEPTH)

    # Sketch42 → Boss-Extrude6 (add)
    with BuildSketch(Plane.XZ.offset(3.125)):
        with Locations((-2.5, -0.45)):
            Rectangle(SKETCH42_W, SKETCH42_H)
    extrude(amount=BOSS_EXTRUDE6_DEPTH)

    # Sketch43 → Boss-Extrude7 (add)
    with BuildSketch(Plane.XZ.offset(3.125)):
        with Locations((2.5, -0.45)):
            Rectangle(SKETCH43_W, SKETCH43_H)
    extrude(amount=BOSS_EXTRUDE7_DEPTH)

    # Sketch44 → Boss-Extrude8 (add)
    with BuildSketch(Plane(origin=(0, -1.975, 0), x_dir=(-1, 0, 0), z_dir=(0, 1, 0))):
        with Locations((-2.5, -0.45)):
            Rectangle(SKETCH44_W, SKETCH44_H)
    extrude(amount=BOSS_EXTRUDE8_DEPTH)

    # Sketch45 → Boss-Extrude9 (add)
    with BuildSketch(Plane(origin=(0, -1.975, 0), x_dir=(-1, 0, 0), z_dir=(0, 1, 0))):
        with Locations((-1.25, -0.45)):
            Rectangle(SKETCH45_W, SKETCH45_H)
    extrude(amount=BOSS_EXTRUDE9_DEPTH)

    # Sketch46 → Boss-Extrude10 (add)
    with BuildSketch(Plane(origin=(0, -1.975, 0), x_dir=(-1, 0, 0), z_dir=(0, 1, 0))):
        with Locations((0, -0.45)):
            Rectangle(SKETCH46_W, SKETCH46_H)
    extrude(amount=BOSS_EXTRUDE10_DEPTH)

    # Sketch47 → Boss-Extrude11 (add)
    with BuildSketch(Plane(origin=(0, -1.975, 0), x_dir=(-1, 0, 0), z_dir=(0, 1, 0))):
        with Locations((1.25, -0.45)):
            Rectangle(SKETCH47_W, SKETCH47_H)
    extrude(amount=BOSS_EXTRUDE11_DEPTH)

    # Sketch48 → Boss-Extrude12 (add)
    with BuildSketch(Plane(origin=(0, -1.975, 0), x_dir=(-1, 0, 0), z_dir=(0, 1, 0))):
        with Locations((2.5, -0.45)):
            Rectangle(SKETCH48_W, SKETCH48_H)
    extrude(amount=BOSS_EXTRUDE12_DEPTH)

    # Draft1
    draft1_faces = [part.faces().sort_by_distance(p)[0] for p in [
        (-3.55, -0.5, -0.356767045),
    ]]
    draft(draft1_faces, Plane(origin=(-3.4, 0, 0), x_dir=(0, 0, 1), z_dir=(1, 0, 0)), DRAFT1_ANGLE)

    # Draft2
    draft2_faces = [part.faces().sort_by_distance(p)[0] for p in [
        (3.55, -0.5, -0.426834509),
        (3.55, -0.5, 0.426834509),
    ]]
    draft(draft2_faces, Plane(origin=(3.7, -1.975, 0.426834509), x_dir=(0, 0, -1), z_dir=(-1, 0, 0)), DRAFT2_ANGLE)

    # Fillet1
    fillet1_edges = [part.edges().sort_by_distance(p)[0] for p in [
        (-3.4, -0.5, -0.356767045),
        (-3.4, -0.5, 0.356767045),
        (3.4, -0.5, -0.356767045),
        (3.4, -0.5, 0.356767045),
    ]]
    fillet(fillet1_edges, radius=FILLET1_R)

    # Chamfer1
    # the kernel refuses this chamfer: 0.2 mm, written as the material it takes off along each edge
    with BuildSketch(Plane(origin=(3.4, 0.975, 1.714336598), x_dir=(0.9996219169112966, 0.02749587661058616, 0), z_dir=(0, 0, -1)), Plane(origin=(-3.4, 0.975, -0.069336598), x_dir=(-0.9996219169112968, 0.027495876610586105, 0), z_dir=(0, 0, 1))) as chamfer1_piece_1:
        Polygon((CHAMFER1_SIZE * 0.999621916911, CHAMFER1_SIZE * 0.0274958766106), (-CHAMFER1_SIZE * 0.0274958766106, CHAMFER1_SIZE * 0.999621916911), (0, 0), align=None)
    extrude(amount=1.783673195, mode=Mode.SUBTRACT)
    with BuildSketch(Plane(origin=(3.4, 0.975, 0.069336598), x_dir=(0.9996219169112966, 0.02749587661058616, 0), z_dir=(0, 0, -1)), Plane(origin=(-3.4, 0.975, -1.2), x_dir=(-0.9996219169112966, 0.02749587661058616, 0), z_dir=(0, 0, 1))) as chamfer1_piece_2:
        Polygon((CHAMFER1_SIZE * 0.999621916911, CHAMFER1_SIZE * 0.0274958766106), (-CHAMFER1_SIZE * 0.0274958766106, CHAMFER1_SIZE * 0.999621916911), (0, 0), align=None)
    extrude(amount=1.269336598, mode=Mode.SUBTRACT)
    with BuildSketch(Plane(origin=(3.4, 0.975, -1.2), x_dir=(0, 0.027495876610586223, -0.9996219169112966), z_dir=(-1, 0, 0))) as chamfer1_piece_3:
        Polygon((CHAMFER1_SIZE * 0.999621916911, CHAMFER1_SIZE * 0.0274958766106), (-CHAMFER1_SIZE * 0.0274958766106, CHAMFER1_SIZE * 0.999621916911), (0, 0), align=None)
    extrude(amount=6.8, mode=Mode.SUBTRACT)
    with BuildSketch(Plane(origin=(3.4, 0.975, 0.069336598), x_dir=(0.9996219169112966, 0.02749587661058616, 0), z_dir=(0, 0, -1))) as chamfer1_piece_4a_section:
        Polygon((CHAMFER1_SIZE * 0.999621916911, CHAMFER1_SIZE * 0.0274958766106), (-CHAMFER1_SIZE * 0.0274958766106, CHAMFER1_SIZE * 0.999621916911), (0, 0), align=None)
    chamfer1_piece_4a = extrude(amount=1.783673195, mode=Mode.PRIVATE)
    chamfer1_piece_4a = split(chamfer1_piece_4a, bisect_by=Plane(origin=(3.465958725, 0.909041275, -1.2), z_dir=(0, 0, -1)), keep=Keep.TOP, mode=Mode.PRIVATE)
    with BuildSketch(Plane(origin=(3.914336598, 0.975, -1.2), x_dir=(0, 0.02749587661058619, -0.9996219169112966), z_dir=(-1, 0, 0))) as chamfer1_piece_4b_section:
        Polygon((CHAMFER1_SIZE * 0.999621916911, CHAMFER1_SIZE * 0.0274958766106), (-CHAMFER1_SIZE * 0.0274958766106, CHAMFER1_SIZE * 0.999621916911), (0, 0), align=None)
    chamfer1_piece_4b = extrude(amount=7.314336598, mode=Mode.PRIVATE)
    chamfer1_piece_4b = split(chamfer1_piece_4b, bisect_by=Plane(origin=(3.4, 0.909041275, -1.265958725), z_dir=(1, 0, 0)), keep=Keep.TOP, mode=Mode.PRIVATE)
    chamfer1_piece_4 = chamfer1_piece_4a & chamfer1_piece_4b
    add(chamfer1_piece_4, mode=Mode.SUBTRACT)
    with BuildSketch(Plane(origin=(3.4, 0.975, -1.2), x_dir=(0, 0.027495876610586223, -0.9996219169112966), z_dir=(-1, 0, 0))) as chamfer1_piece_5a_section:
        Polygon((CHAMFER1_SIZE * 0.999621916911, CHAMFER1_SIZE * 0.0274958766106), (-CHAMFER1_SIZE * 0.0274958766106, CHAMFER1_SIZE * 0.999621916911), (0, 0), align=None)
    chamfer1_piece_5a = extrude(amount=7.314336598, mode=Mode.PRIVATE)
    chamfer1_piece_5a = split(chamfer1_piece_5a, bisect_by=Plane(origin=(-3.4, 0.909041275, -1.265958725), z_dir=(-1, 0, 0)), keep=Keep.TOP, mode=Mode.PRIVATE)
    with BuildSketch(Plane(origin=(-3.4, 0.975, -1.714336598), x_dir=(-0.9996219169112968, 0.027495876610586105, 0), z_dir=(0, 0, 1))) as chamfer1_piece_5b_section:
        Polygon((CHAMFER1_SIZE * 0.999621916911, CHAMFER1_SIZE * 0.0274958766106), (-CHAMFER1_SIZE * 0.0274958766106, CHAMFER1_SIZE * 0.999621916911), (0, 0), align=None)
    chamfer1_piece_5b = extrude(amount=1.783673195, mode=Mode.PRIVATE)
    chamfer1_piece_5b = split(chamfer1_piece_5b, bisect_by=Plane(origin=(-3.465958725, 0.909041275, -1.2), z_dir=(0, 0, -1)), keep=Keep.TOP, mode=Mode.PRIVATE)
    chamfer1_piece_5 = chamfer1_piece_5a & chamfer1_piece_5b
    add(chamfer1_piece_5, mode=Mode.SUBTRACT)


solid = part.part
